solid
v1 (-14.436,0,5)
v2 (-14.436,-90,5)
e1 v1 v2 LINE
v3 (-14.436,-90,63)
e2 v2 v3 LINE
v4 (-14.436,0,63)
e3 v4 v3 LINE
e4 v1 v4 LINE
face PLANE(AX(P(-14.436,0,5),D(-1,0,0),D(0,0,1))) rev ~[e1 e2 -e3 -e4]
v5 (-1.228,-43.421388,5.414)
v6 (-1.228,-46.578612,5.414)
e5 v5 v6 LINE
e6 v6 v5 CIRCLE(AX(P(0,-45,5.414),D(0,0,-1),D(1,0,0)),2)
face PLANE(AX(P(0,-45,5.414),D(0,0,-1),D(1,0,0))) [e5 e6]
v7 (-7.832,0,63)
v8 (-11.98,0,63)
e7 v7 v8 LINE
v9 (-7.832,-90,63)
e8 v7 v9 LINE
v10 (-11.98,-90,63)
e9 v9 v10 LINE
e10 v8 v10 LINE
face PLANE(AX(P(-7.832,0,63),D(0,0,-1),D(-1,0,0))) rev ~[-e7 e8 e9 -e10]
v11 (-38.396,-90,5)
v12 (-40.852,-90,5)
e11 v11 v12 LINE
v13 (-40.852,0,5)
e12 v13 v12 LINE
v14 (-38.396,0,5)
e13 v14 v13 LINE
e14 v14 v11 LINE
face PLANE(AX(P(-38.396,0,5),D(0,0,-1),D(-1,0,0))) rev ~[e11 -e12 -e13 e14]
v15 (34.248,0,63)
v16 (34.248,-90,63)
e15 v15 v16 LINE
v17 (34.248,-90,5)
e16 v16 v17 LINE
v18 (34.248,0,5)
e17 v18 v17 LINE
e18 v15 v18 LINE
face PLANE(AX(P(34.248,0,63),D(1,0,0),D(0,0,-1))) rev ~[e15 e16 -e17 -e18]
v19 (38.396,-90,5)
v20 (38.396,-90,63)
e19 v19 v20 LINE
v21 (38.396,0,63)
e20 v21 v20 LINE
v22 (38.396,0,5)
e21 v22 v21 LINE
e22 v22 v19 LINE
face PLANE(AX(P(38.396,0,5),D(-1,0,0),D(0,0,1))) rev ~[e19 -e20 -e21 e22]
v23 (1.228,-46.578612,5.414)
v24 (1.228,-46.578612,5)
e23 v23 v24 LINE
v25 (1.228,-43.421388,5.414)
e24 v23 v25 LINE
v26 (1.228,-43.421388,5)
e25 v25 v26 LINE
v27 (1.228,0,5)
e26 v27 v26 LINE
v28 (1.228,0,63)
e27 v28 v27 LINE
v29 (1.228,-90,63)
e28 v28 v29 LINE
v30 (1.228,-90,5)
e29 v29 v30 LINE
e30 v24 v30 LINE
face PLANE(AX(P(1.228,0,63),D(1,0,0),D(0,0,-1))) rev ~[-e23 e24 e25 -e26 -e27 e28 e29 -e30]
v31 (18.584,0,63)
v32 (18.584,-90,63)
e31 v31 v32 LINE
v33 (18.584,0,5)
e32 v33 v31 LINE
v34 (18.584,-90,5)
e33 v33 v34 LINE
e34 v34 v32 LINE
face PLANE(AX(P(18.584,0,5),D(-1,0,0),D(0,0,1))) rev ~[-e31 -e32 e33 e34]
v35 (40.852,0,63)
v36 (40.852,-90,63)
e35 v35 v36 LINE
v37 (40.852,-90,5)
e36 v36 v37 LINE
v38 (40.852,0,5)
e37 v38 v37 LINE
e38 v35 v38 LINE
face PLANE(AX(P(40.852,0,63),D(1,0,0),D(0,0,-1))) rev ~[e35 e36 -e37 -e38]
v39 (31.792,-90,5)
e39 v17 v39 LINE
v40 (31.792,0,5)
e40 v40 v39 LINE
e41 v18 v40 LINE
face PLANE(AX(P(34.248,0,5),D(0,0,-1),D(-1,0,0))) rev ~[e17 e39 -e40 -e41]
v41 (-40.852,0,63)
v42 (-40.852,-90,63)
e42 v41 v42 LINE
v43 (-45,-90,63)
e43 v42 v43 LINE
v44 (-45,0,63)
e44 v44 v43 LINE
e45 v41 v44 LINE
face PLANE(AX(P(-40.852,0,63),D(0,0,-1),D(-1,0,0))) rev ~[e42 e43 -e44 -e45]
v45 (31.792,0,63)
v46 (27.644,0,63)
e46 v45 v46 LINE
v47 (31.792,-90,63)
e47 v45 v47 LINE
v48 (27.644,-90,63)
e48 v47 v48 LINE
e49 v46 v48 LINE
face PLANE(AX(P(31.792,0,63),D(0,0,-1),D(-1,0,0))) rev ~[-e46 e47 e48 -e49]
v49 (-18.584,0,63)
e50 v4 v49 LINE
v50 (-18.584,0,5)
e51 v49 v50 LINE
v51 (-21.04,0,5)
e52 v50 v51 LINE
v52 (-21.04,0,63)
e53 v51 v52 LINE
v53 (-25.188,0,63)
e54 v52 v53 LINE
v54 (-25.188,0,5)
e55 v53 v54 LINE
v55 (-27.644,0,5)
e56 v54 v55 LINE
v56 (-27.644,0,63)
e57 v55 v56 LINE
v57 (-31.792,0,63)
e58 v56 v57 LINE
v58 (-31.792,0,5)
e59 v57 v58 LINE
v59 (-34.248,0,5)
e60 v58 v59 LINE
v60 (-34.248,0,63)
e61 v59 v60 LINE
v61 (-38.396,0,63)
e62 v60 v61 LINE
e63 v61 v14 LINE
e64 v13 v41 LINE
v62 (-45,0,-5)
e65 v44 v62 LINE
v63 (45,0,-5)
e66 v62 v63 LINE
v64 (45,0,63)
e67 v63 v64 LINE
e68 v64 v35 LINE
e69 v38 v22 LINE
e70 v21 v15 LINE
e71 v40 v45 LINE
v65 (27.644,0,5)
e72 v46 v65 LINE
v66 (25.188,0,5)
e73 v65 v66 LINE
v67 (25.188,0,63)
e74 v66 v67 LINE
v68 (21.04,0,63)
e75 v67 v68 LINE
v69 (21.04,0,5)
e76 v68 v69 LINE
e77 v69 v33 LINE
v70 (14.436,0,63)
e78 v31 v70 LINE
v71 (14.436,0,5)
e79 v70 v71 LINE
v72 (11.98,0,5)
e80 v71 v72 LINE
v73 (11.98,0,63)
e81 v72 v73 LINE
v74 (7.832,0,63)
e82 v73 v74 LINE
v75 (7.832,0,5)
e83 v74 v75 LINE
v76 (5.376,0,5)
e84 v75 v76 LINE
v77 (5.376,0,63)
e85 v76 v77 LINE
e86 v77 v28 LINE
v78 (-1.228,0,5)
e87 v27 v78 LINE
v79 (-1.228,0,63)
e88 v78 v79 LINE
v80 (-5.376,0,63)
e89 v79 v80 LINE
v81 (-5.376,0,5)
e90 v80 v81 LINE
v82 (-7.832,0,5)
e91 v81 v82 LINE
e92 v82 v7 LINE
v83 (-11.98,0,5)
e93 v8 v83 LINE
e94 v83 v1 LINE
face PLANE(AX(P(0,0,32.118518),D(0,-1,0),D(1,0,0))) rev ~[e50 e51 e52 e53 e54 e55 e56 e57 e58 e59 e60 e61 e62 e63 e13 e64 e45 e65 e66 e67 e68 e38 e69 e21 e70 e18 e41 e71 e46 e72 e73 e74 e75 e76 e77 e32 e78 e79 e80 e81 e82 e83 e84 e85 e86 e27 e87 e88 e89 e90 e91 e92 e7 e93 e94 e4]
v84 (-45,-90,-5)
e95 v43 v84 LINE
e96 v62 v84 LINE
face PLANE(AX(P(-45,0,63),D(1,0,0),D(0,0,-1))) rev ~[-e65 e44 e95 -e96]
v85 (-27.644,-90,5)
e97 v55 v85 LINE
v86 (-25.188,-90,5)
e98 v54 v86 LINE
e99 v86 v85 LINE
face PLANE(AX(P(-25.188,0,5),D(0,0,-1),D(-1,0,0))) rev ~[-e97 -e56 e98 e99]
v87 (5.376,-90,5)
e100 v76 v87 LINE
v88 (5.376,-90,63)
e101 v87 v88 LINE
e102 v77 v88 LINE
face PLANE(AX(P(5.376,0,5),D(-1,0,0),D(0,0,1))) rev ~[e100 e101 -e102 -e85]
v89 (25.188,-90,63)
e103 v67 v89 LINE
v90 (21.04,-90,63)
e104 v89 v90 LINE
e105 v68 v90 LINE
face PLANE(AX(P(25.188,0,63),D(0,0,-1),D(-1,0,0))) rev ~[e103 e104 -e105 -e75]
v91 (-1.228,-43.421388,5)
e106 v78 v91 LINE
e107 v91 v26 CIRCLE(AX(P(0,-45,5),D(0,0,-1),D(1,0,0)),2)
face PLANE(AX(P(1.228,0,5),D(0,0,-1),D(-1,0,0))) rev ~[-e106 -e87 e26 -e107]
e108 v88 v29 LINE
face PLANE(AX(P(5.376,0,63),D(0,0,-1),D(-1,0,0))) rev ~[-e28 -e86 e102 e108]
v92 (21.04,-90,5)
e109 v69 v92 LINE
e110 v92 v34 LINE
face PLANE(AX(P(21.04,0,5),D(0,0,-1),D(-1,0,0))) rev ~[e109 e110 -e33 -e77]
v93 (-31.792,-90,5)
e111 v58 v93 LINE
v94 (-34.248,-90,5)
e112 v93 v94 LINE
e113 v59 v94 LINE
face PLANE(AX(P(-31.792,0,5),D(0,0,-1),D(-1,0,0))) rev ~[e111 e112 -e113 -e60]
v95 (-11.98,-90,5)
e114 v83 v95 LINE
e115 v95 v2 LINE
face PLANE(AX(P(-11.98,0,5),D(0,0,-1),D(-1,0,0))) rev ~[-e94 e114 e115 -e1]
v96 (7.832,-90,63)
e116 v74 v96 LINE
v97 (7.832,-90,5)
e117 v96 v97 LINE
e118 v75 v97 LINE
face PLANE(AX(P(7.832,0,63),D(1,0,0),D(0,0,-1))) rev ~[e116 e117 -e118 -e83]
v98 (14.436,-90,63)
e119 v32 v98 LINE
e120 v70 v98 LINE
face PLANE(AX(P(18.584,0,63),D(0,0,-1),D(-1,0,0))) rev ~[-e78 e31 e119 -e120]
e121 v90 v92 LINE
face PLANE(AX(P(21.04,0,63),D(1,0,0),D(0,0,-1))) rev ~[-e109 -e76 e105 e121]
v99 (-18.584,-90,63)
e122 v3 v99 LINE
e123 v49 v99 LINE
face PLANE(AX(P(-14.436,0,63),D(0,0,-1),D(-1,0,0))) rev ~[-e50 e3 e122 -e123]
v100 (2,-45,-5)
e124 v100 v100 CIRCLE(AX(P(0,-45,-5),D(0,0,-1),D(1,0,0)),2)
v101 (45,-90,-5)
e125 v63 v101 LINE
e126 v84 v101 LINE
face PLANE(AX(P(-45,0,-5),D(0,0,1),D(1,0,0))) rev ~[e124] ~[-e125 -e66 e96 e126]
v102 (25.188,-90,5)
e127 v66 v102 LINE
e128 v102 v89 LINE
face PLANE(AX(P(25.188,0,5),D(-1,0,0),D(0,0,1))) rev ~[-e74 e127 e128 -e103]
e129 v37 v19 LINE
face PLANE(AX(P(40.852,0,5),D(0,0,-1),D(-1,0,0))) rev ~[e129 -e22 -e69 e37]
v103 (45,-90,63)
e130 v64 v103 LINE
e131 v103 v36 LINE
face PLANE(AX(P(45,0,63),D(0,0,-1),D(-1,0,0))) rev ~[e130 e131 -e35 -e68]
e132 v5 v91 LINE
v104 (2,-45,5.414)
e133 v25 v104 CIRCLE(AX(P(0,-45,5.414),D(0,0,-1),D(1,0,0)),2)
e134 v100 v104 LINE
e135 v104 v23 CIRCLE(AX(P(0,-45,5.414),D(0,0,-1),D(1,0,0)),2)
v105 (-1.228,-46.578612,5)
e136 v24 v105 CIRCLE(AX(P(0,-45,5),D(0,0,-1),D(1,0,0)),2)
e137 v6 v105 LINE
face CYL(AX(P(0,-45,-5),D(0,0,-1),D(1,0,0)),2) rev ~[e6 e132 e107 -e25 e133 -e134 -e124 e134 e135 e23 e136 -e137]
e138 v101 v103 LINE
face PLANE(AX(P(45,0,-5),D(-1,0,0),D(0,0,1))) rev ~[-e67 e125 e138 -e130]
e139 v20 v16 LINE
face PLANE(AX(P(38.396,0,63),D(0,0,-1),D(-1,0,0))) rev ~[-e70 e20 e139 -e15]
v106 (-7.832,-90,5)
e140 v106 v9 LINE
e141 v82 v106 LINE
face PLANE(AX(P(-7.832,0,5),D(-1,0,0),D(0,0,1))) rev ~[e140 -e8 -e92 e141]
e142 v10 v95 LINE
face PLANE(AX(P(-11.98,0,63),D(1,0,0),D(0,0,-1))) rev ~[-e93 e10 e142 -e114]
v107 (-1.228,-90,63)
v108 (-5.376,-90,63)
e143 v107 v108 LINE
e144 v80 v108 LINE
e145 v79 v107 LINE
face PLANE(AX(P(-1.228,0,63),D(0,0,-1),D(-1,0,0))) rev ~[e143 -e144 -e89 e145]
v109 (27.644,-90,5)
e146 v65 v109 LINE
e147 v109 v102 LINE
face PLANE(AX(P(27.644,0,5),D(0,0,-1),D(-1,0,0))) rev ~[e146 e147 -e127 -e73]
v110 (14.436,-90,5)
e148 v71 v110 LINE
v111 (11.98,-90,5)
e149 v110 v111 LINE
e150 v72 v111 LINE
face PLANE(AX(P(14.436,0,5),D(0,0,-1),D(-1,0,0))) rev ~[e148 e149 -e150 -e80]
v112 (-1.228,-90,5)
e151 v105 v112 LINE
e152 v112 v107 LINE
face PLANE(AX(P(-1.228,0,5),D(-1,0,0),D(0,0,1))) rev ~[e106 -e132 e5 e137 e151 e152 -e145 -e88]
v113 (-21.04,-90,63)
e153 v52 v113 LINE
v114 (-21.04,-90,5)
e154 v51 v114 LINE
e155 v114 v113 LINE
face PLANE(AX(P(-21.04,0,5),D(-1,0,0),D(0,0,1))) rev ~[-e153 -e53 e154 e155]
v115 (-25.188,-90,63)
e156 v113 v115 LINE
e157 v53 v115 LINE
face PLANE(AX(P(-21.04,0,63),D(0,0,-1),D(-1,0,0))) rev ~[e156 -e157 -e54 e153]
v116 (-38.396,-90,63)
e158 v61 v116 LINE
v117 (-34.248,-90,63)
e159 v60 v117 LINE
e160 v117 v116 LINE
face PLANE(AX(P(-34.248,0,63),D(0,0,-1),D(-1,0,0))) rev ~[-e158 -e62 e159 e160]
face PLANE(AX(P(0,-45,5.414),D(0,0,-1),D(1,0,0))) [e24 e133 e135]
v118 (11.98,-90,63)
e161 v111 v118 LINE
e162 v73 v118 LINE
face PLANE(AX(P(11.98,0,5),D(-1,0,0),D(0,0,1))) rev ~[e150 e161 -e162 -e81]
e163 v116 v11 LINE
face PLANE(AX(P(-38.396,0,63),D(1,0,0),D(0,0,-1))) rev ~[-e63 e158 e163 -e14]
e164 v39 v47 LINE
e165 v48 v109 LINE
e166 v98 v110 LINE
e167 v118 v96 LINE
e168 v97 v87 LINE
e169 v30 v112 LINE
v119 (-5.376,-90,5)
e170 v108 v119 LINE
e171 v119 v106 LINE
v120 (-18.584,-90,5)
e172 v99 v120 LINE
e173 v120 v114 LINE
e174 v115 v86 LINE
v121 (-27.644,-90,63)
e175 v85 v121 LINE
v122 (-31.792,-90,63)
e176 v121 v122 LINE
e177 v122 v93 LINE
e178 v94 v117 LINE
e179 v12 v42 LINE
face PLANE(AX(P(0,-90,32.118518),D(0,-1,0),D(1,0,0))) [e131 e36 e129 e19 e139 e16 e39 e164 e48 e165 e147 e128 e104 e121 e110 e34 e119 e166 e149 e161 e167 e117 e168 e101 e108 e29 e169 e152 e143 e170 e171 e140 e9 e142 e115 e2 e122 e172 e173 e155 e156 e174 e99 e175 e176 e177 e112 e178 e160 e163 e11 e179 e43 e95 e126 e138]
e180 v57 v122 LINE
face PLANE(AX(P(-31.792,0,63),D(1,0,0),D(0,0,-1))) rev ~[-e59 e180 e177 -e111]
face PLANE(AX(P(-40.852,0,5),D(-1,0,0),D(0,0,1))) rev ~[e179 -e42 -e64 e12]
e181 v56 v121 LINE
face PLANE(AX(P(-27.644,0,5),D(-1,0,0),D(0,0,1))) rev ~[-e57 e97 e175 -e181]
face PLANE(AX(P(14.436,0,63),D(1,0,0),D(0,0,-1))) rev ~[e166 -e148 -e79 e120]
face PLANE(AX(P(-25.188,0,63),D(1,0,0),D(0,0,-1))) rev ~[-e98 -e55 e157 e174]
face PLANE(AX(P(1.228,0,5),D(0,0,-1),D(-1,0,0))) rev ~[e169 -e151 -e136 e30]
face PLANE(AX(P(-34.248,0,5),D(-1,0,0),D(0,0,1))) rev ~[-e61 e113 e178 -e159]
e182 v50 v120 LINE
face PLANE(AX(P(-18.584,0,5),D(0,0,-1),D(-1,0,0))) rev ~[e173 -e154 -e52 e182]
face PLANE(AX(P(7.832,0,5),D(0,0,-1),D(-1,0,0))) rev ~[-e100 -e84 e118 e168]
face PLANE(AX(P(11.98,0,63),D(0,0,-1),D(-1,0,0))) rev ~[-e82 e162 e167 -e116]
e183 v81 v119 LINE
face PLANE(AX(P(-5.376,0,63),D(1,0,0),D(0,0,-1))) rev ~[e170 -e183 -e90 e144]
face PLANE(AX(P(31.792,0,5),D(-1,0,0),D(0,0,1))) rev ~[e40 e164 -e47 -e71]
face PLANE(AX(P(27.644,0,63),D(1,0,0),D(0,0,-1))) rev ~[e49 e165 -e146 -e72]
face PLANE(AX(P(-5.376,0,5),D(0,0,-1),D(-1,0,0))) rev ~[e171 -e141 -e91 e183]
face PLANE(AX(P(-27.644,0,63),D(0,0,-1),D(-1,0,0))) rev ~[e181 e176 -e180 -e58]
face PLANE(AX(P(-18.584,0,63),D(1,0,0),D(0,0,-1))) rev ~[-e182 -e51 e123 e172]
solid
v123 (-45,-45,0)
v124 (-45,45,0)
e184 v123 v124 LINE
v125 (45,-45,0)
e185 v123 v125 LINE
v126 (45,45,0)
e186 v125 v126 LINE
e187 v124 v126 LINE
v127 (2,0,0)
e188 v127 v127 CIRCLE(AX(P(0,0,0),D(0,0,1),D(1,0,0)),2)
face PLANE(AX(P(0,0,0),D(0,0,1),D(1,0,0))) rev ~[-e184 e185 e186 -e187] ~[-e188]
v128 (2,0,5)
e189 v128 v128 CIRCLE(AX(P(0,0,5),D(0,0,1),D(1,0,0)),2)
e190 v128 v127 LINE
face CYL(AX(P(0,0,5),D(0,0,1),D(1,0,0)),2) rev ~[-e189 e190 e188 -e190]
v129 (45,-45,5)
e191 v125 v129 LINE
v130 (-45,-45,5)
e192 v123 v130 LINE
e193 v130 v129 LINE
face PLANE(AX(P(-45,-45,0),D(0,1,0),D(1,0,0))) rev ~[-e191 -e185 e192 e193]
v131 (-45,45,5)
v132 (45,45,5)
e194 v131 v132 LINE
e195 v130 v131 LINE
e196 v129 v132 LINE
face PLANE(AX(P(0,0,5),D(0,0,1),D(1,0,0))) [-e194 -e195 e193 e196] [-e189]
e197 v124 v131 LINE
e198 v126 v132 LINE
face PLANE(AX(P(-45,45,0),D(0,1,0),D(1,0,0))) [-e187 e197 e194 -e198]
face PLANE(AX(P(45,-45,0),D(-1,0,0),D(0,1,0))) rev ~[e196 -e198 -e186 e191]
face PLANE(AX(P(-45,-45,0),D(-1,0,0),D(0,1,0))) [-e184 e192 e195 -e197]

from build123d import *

# Parameters (mm, degrees)
F1_DEPTH = 90
F2_R     = 2
F3_DEPTH = 10.414
F4_W     = 90
F4_H     = 90
F5_DEPTH = 5
F6_R     = 2
F7_DEPTH = 25.4


with BuildPart() as f1:
    # F0 (on Front) → F1 (new body)
    with BuildSketch(Plane.XZ):
        Polygon((-45, 5), (-45, -5), (45, -5), (45, 5), (45, 63), (40.852, 63), (40.852, 5), (38.396, 5), (38.396, 63), (34.248, 63), (34.248, 5), (31.792, 5), (31.792, 63), (27.644, 63), (27.644, 5), (25.188, 5), (25.188, 63), (21.04, 63), (21.04, 5), (18.584, 5), (18.584, 63), (14.436, 63), (14.436, 5), (11.98, 5), (11.98, 63), (7.832, 63), (7.832, 5), (5.376, 5), (5.376, 63), (1.228, 63), (1.228, 5), (-1.228, 5), (-1.228, 63), (-5.376, 63), (-5.376, 5), (-7.832, 5), (-7.832, 63), (-11.98, 63), (-11.98, 5), (-14.436, 5), (-14.436, 63), (-18.584, 63), (-18.584, 5), (-21.04, 5), (-21.04, 63), (-25.188, 63), (-25.188, 5), (-27.644, 5), (-27.644, 63), (-31.792, 63), (-31.792, 5), (-34.248, 5), (-34.248, 63), (-38.396, 63), (-38.396, 5), (-40.852, 5), (-40.852, 63), (-45, 63), align=None)
    extrude(amount=F1_DEPTH)

    # F2 (on face) → F3 (cut)
    with BuildSketch(Plane(origin=(0, 0, -5), x_dir=(1, 0, 0), z_dir=(0, 0, -1))):
        with Locations((0, 45)):
            Circle(F2_R)
    extrude(amount=-F3_DEPTH, mode=Mode.SUBTRACT)


with BuildPart() as f5:
    # F4 (on Top) → F5 (new body)
    with BuildSketch(Plane.XY):
        Rectangle(F4_W, F4_H)
    extrude(amount=F5_DEPTH)

    # F6 (on face) → F7 (cut)
    with BuildSketch(Plane.XY.offset(5)):
        Circle(F6_R)
    extrude(amount=-F7_DEPTH, mode=Mode.SUBTRACT)


solid = Compound([f1.part, f5.part])
